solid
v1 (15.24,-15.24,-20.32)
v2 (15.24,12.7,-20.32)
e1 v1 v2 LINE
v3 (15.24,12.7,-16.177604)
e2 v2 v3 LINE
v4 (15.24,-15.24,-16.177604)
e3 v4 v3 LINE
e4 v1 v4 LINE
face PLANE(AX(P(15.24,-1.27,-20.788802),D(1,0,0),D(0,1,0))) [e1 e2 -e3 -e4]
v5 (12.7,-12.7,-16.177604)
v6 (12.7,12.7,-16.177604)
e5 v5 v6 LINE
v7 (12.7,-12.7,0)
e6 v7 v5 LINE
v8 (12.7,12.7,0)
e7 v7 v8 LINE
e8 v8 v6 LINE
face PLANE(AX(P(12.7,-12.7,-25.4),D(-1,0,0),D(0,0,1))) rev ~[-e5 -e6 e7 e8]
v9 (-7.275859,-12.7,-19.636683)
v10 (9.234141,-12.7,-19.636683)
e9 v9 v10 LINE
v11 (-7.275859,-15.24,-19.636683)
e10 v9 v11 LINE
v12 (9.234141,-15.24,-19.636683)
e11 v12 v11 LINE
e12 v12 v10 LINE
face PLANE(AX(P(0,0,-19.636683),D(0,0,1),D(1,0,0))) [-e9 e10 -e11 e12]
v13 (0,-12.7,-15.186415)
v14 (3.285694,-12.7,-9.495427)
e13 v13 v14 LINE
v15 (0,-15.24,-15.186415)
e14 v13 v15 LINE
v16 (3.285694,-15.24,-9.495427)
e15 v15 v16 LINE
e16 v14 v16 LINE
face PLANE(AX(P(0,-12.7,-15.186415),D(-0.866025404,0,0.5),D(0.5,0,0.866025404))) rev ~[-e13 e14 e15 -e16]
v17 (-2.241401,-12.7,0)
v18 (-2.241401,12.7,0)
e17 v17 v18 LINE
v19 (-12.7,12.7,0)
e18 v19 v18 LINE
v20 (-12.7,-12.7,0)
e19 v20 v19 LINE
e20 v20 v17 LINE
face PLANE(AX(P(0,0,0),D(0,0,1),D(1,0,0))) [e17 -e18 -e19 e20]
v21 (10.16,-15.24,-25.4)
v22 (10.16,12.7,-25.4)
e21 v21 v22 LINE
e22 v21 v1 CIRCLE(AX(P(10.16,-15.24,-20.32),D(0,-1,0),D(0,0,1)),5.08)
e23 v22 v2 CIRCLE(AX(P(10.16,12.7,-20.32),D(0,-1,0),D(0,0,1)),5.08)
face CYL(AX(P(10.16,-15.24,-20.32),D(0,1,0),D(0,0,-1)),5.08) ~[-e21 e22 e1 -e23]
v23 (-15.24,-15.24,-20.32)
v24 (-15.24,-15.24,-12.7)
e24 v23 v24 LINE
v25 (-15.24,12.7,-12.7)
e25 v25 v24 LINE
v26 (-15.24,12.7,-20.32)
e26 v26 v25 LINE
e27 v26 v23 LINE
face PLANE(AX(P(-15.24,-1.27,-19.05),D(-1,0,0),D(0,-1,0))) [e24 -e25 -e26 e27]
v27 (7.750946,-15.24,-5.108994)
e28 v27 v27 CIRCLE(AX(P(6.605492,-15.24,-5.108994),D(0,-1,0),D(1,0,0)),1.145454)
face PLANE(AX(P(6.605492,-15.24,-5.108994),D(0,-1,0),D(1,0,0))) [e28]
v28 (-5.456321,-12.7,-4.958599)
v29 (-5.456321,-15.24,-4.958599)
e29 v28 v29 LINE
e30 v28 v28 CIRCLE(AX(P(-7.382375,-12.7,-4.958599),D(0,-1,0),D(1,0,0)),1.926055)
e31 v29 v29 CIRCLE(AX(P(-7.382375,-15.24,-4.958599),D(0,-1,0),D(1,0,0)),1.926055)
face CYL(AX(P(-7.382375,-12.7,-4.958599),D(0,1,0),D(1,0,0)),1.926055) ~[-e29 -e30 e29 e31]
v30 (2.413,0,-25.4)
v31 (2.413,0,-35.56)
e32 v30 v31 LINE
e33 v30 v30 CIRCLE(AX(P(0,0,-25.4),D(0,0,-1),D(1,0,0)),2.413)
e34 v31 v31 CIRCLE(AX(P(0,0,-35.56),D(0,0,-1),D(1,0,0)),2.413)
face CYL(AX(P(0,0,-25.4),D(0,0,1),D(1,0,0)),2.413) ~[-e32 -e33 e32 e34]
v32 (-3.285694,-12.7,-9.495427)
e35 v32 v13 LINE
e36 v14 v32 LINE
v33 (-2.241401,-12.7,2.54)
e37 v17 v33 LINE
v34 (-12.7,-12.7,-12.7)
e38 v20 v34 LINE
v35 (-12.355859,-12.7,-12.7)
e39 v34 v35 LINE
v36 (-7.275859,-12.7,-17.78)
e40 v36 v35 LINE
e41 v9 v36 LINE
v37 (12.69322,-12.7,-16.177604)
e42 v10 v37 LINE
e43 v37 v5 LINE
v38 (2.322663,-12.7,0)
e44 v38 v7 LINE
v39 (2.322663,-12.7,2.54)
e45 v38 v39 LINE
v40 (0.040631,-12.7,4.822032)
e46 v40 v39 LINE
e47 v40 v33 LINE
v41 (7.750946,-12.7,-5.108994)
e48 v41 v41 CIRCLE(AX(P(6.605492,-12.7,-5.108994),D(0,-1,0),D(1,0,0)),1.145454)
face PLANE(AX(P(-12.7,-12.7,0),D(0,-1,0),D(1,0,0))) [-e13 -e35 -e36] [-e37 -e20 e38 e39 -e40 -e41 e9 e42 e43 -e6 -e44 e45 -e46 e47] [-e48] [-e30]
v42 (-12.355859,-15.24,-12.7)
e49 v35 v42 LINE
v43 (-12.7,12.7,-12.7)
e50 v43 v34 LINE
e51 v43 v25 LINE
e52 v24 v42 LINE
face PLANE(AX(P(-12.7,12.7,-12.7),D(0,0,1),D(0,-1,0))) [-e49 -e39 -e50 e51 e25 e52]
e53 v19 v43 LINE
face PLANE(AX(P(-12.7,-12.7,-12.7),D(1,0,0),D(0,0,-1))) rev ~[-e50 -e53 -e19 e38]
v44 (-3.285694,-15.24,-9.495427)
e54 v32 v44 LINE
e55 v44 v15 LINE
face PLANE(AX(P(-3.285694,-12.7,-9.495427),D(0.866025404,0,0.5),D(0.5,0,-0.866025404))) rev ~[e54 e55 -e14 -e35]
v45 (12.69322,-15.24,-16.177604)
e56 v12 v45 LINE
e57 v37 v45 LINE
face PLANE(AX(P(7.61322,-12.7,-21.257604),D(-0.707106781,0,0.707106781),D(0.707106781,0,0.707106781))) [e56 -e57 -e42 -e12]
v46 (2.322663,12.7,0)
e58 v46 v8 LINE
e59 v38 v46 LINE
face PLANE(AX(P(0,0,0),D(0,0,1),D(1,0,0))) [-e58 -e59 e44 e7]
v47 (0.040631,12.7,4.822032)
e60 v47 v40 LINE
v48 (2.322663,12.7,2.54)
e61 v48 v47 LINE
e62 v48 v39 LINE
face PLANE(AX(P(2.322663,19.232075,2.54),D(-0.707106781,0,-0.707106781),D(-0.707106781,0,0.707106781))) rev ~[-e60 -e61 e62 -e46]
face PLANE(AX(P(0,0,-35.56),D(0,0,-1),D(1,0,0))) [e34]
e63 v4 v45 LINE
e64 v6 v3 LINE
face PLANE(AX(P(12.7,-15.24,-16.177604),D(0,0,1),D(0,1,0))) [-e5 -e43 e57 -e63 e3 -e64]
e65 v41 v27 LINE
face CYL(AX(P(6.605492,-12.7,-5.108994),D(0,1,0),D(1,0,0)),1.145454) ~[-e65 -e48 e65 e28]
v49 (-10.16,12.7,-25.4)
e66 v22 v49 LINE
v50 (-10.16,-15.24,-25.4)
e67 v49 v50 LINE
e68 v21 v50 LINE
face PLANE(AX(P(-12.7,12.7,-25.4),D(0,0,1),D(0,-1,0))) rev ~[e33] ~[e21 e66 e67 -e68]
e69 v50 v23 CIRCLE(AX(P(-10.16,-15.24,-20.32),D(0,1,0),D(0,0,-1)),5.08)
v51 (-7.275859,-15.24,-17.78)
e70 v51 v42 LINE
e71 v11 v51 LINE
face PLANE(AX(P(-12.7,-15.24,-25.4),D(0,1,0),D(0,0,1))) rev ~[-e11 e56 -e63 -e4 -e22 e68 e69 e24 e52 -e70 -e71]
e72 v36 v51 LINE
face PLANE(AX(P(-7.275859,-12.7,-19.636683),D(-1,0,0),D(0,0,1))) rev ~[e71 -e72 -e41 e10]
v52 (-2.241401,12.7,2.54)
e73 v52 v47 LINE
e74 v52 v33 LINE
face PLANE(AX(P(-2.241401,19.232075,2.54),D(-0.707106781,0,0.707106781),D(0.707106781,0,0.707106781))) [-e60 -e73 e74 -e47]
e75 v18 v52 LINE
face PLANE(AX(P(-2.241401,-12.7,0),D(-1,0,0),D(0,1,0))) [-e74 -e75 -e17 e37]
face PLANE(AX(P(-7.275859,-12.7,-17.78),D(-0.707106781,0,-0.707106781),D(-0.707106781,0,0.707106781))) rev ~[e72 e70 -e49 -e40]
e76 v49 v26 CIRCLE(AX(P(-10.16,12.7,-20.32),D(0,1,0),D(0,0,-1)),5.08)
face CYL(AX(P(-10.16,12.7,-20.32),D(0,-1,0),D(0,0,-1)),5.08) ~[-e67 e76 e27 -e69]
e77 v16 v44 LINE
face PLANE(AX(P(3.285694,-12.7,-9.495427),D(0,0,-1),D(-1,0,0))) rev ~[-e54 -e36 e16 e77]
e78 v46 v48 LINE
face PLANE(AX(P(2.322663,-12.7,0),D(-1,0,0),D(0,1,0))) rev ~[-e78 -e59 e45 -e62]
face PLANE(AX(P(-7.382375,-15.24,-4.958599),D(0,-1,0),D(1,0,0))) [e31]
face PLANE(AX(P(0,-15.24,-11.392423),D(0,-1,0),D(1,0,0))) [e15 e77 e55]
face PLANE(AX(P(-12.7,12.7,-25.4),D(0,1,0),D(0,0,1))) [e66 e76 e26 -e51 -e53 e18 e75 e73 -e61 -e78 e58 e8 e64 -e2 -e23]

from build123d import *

# Parameters (mm, degrees)
F0_W         = 25.4
F0_H         = 25.4
F1_DEPTH     = 25.4
F2_W         = 5.424141106
F2_H         = 6.936683166
F2_W_2       = 5.0867797479
F2_H_2       = 3.4590791911
F3_DEPTH     = 2.54
F4_R         = 1.9260545118
F4_R_2       = 1.1454537096
F5_DEPTH     = 2.54
F7_DEPTH     = 2.54
F8_W         = 27.94
F8_H         = 9.2223960251
F9_DEPTH     = 2.54
F10_W        = 27.94
F10_H        = 12.7
F11_DEPTH    = 2.54
F12_T1_DEPTH = 15.6041495789
F12_T6_DEPTH = 15.6041495789
F13_W        = 4.5640636235
F13_H        = 25.4
F14_DEPTH    = 5.08
F15_T1_DEPTH = 38.4641495789
F16_R        = 5.08
F17_R        = 2.413
F18_DEPTH    = 10.16


# Not quite as in the source:
# - a fillet or chamfer that OpenCascade refuses, or shapes differently, is made with other operations: its cross-section is extruded or revolved along the edge and cut away or added


with BuildPart() as f1:
    # F0 (on Top) → F1 (new body)
    with BuildSketch(Plane.XY):
        Rectangle(F0_W, F0_H)
    extrude(amount=-F1_DEPTH)

    # F2 (on face) → F3 (join)
    with BuildSketch(Plane.XZ.offset(12.7)):
        Polygon((-12.7, -19.636683166), (-12.7, -25.4), (12.7, -25.4), (12.7, -19.636683166), (7.6132202521, -19.636683166), (-7.275858894, -19.636683166), align=None)
        with Locations((-9.987929447, -16.168341583)):
            Rectangle(F2_W, F2_H)
        with Locations((10.156610126, -17.9071435705)):
            Rectangle(F2_W_2, F2_H_2)
    extrude(amount=F3_DEPTH)

    # F4 (on face) → F5 (join)
    with BuildSketch(Plane.XZ.offset(12.7)):
        with Locations((-7.3823751882, -4.9585988745)):
            Circle(F4_R)
        with Locations((6.6054924391, -5.1089939661)):
            Circle(F4_R_2)
    extrude(amount=F5_DEPTH)

    # F6 (on face) → F7 (join)
    with BuildSketch(Plane.XZ.offset(12.7)):
        Polygon((3.2856935422, -9.4954269007), (-3.2856935422, -9.4954269007), (0, -15.1864150539), align=None)
    extrude(amount=F7_DEPTH)

    # F8 (on face) → F9 (join)
    with BuildSketch(Plane.YZ.offset(12.7)):
        with Locations((-1.27, -20.7888019875)):
            Rectangle(F8_W, F8_H)
    extrude(amount=F9_DEPTH)

    # F10 (on face) → F11 (join)
    with BuildSketch(Plane(origin=(-12.7, 0, 0), x_dir=(0, -1, 0), z_dir=(-1, 0, 0))):
        with Locations((1.27, -19.05)):
            Rectangle(F10_W, F10_H)
    extrude(amount=F11_DEPTH)

    # F12: chamfer of 5.08 on 2 edges, made by hand

    # F12_s2 → F12_t1 (cut)
    with BuildSketch(Plane.XZ.offset(12.7)):
        Polygon((-7.275858894, -17.78), (-12.355858894, -12.7), (-7.275858894, -12.7), align=None)
    extrude(amount=F12_T1_DEPTH, mode=Mode.SUBTRACT)


with BuildPart() as f12_tool4:
    # F12_s5 → F12_t6 (new body)
    with BuildSketch(Plane.XZ.offset(12.7)):
        Polygon((7.6132202521, -21.2576039749), (12.6932202521, -16.1776039749), (7.6132202521, -16.1776039749), align=None)
    extrude(amount=F12_T6_DEPTH)

    split(bisect_by=Plane.XY.offset(-19.636683166), keep=Keep.TOP)


with BuildPart() as f1_1:
    add(f1.part)

    # F12_t3: cut F12_tool4
    add(f12_tool4.part, mode=Mode.SUBTRACT)

    # F13 (on face) → F14 (join)
    with BuildSketch(Plane.XY):
        with Locations((0.04063081, 0)):
            Rectangle(F13_W, F13_H)
    extrude(amount=F14_DEPTH)

    # F15: chamfer of 2.54 on 2 edges, made by hand

    # F15_s2 → F15_t1 (cut)
    with BuildSketch(Plane.XZ.offset(-19.2320747894)):
        Polygon((2.3226626217, 2.54), (-0.2173373783, 5.08), (2.3226626217, 5.08), align=None)
        Polygon((-2.2414010018, 2.54), (0.2985989982, 5.08), (-2.2414010018, 5.08), align=None)
    extrude(amount=F15_T1_DEPTH, mode=Mode.SUBTRACT)

    # F16
    f16_edges = [f1_1.edges().sort_by_distance(p)[0] for p in [
        (15.24, -1.27, -25.4),
        (-15.24, -1.27, -25.4),
    ]]
    fillet(f16_edges, radius=F16_R)

    # F17 (on face) → F18 (join)
    with BuildSketch(Plane(origin=(0, 0, -25.4), x_dir=(1, 0, 0), z_dir=(0, 0, -1))):
        Circle(F17_R)
    extrude(amount=F18_DEPTH)


solid = f1_1.part
